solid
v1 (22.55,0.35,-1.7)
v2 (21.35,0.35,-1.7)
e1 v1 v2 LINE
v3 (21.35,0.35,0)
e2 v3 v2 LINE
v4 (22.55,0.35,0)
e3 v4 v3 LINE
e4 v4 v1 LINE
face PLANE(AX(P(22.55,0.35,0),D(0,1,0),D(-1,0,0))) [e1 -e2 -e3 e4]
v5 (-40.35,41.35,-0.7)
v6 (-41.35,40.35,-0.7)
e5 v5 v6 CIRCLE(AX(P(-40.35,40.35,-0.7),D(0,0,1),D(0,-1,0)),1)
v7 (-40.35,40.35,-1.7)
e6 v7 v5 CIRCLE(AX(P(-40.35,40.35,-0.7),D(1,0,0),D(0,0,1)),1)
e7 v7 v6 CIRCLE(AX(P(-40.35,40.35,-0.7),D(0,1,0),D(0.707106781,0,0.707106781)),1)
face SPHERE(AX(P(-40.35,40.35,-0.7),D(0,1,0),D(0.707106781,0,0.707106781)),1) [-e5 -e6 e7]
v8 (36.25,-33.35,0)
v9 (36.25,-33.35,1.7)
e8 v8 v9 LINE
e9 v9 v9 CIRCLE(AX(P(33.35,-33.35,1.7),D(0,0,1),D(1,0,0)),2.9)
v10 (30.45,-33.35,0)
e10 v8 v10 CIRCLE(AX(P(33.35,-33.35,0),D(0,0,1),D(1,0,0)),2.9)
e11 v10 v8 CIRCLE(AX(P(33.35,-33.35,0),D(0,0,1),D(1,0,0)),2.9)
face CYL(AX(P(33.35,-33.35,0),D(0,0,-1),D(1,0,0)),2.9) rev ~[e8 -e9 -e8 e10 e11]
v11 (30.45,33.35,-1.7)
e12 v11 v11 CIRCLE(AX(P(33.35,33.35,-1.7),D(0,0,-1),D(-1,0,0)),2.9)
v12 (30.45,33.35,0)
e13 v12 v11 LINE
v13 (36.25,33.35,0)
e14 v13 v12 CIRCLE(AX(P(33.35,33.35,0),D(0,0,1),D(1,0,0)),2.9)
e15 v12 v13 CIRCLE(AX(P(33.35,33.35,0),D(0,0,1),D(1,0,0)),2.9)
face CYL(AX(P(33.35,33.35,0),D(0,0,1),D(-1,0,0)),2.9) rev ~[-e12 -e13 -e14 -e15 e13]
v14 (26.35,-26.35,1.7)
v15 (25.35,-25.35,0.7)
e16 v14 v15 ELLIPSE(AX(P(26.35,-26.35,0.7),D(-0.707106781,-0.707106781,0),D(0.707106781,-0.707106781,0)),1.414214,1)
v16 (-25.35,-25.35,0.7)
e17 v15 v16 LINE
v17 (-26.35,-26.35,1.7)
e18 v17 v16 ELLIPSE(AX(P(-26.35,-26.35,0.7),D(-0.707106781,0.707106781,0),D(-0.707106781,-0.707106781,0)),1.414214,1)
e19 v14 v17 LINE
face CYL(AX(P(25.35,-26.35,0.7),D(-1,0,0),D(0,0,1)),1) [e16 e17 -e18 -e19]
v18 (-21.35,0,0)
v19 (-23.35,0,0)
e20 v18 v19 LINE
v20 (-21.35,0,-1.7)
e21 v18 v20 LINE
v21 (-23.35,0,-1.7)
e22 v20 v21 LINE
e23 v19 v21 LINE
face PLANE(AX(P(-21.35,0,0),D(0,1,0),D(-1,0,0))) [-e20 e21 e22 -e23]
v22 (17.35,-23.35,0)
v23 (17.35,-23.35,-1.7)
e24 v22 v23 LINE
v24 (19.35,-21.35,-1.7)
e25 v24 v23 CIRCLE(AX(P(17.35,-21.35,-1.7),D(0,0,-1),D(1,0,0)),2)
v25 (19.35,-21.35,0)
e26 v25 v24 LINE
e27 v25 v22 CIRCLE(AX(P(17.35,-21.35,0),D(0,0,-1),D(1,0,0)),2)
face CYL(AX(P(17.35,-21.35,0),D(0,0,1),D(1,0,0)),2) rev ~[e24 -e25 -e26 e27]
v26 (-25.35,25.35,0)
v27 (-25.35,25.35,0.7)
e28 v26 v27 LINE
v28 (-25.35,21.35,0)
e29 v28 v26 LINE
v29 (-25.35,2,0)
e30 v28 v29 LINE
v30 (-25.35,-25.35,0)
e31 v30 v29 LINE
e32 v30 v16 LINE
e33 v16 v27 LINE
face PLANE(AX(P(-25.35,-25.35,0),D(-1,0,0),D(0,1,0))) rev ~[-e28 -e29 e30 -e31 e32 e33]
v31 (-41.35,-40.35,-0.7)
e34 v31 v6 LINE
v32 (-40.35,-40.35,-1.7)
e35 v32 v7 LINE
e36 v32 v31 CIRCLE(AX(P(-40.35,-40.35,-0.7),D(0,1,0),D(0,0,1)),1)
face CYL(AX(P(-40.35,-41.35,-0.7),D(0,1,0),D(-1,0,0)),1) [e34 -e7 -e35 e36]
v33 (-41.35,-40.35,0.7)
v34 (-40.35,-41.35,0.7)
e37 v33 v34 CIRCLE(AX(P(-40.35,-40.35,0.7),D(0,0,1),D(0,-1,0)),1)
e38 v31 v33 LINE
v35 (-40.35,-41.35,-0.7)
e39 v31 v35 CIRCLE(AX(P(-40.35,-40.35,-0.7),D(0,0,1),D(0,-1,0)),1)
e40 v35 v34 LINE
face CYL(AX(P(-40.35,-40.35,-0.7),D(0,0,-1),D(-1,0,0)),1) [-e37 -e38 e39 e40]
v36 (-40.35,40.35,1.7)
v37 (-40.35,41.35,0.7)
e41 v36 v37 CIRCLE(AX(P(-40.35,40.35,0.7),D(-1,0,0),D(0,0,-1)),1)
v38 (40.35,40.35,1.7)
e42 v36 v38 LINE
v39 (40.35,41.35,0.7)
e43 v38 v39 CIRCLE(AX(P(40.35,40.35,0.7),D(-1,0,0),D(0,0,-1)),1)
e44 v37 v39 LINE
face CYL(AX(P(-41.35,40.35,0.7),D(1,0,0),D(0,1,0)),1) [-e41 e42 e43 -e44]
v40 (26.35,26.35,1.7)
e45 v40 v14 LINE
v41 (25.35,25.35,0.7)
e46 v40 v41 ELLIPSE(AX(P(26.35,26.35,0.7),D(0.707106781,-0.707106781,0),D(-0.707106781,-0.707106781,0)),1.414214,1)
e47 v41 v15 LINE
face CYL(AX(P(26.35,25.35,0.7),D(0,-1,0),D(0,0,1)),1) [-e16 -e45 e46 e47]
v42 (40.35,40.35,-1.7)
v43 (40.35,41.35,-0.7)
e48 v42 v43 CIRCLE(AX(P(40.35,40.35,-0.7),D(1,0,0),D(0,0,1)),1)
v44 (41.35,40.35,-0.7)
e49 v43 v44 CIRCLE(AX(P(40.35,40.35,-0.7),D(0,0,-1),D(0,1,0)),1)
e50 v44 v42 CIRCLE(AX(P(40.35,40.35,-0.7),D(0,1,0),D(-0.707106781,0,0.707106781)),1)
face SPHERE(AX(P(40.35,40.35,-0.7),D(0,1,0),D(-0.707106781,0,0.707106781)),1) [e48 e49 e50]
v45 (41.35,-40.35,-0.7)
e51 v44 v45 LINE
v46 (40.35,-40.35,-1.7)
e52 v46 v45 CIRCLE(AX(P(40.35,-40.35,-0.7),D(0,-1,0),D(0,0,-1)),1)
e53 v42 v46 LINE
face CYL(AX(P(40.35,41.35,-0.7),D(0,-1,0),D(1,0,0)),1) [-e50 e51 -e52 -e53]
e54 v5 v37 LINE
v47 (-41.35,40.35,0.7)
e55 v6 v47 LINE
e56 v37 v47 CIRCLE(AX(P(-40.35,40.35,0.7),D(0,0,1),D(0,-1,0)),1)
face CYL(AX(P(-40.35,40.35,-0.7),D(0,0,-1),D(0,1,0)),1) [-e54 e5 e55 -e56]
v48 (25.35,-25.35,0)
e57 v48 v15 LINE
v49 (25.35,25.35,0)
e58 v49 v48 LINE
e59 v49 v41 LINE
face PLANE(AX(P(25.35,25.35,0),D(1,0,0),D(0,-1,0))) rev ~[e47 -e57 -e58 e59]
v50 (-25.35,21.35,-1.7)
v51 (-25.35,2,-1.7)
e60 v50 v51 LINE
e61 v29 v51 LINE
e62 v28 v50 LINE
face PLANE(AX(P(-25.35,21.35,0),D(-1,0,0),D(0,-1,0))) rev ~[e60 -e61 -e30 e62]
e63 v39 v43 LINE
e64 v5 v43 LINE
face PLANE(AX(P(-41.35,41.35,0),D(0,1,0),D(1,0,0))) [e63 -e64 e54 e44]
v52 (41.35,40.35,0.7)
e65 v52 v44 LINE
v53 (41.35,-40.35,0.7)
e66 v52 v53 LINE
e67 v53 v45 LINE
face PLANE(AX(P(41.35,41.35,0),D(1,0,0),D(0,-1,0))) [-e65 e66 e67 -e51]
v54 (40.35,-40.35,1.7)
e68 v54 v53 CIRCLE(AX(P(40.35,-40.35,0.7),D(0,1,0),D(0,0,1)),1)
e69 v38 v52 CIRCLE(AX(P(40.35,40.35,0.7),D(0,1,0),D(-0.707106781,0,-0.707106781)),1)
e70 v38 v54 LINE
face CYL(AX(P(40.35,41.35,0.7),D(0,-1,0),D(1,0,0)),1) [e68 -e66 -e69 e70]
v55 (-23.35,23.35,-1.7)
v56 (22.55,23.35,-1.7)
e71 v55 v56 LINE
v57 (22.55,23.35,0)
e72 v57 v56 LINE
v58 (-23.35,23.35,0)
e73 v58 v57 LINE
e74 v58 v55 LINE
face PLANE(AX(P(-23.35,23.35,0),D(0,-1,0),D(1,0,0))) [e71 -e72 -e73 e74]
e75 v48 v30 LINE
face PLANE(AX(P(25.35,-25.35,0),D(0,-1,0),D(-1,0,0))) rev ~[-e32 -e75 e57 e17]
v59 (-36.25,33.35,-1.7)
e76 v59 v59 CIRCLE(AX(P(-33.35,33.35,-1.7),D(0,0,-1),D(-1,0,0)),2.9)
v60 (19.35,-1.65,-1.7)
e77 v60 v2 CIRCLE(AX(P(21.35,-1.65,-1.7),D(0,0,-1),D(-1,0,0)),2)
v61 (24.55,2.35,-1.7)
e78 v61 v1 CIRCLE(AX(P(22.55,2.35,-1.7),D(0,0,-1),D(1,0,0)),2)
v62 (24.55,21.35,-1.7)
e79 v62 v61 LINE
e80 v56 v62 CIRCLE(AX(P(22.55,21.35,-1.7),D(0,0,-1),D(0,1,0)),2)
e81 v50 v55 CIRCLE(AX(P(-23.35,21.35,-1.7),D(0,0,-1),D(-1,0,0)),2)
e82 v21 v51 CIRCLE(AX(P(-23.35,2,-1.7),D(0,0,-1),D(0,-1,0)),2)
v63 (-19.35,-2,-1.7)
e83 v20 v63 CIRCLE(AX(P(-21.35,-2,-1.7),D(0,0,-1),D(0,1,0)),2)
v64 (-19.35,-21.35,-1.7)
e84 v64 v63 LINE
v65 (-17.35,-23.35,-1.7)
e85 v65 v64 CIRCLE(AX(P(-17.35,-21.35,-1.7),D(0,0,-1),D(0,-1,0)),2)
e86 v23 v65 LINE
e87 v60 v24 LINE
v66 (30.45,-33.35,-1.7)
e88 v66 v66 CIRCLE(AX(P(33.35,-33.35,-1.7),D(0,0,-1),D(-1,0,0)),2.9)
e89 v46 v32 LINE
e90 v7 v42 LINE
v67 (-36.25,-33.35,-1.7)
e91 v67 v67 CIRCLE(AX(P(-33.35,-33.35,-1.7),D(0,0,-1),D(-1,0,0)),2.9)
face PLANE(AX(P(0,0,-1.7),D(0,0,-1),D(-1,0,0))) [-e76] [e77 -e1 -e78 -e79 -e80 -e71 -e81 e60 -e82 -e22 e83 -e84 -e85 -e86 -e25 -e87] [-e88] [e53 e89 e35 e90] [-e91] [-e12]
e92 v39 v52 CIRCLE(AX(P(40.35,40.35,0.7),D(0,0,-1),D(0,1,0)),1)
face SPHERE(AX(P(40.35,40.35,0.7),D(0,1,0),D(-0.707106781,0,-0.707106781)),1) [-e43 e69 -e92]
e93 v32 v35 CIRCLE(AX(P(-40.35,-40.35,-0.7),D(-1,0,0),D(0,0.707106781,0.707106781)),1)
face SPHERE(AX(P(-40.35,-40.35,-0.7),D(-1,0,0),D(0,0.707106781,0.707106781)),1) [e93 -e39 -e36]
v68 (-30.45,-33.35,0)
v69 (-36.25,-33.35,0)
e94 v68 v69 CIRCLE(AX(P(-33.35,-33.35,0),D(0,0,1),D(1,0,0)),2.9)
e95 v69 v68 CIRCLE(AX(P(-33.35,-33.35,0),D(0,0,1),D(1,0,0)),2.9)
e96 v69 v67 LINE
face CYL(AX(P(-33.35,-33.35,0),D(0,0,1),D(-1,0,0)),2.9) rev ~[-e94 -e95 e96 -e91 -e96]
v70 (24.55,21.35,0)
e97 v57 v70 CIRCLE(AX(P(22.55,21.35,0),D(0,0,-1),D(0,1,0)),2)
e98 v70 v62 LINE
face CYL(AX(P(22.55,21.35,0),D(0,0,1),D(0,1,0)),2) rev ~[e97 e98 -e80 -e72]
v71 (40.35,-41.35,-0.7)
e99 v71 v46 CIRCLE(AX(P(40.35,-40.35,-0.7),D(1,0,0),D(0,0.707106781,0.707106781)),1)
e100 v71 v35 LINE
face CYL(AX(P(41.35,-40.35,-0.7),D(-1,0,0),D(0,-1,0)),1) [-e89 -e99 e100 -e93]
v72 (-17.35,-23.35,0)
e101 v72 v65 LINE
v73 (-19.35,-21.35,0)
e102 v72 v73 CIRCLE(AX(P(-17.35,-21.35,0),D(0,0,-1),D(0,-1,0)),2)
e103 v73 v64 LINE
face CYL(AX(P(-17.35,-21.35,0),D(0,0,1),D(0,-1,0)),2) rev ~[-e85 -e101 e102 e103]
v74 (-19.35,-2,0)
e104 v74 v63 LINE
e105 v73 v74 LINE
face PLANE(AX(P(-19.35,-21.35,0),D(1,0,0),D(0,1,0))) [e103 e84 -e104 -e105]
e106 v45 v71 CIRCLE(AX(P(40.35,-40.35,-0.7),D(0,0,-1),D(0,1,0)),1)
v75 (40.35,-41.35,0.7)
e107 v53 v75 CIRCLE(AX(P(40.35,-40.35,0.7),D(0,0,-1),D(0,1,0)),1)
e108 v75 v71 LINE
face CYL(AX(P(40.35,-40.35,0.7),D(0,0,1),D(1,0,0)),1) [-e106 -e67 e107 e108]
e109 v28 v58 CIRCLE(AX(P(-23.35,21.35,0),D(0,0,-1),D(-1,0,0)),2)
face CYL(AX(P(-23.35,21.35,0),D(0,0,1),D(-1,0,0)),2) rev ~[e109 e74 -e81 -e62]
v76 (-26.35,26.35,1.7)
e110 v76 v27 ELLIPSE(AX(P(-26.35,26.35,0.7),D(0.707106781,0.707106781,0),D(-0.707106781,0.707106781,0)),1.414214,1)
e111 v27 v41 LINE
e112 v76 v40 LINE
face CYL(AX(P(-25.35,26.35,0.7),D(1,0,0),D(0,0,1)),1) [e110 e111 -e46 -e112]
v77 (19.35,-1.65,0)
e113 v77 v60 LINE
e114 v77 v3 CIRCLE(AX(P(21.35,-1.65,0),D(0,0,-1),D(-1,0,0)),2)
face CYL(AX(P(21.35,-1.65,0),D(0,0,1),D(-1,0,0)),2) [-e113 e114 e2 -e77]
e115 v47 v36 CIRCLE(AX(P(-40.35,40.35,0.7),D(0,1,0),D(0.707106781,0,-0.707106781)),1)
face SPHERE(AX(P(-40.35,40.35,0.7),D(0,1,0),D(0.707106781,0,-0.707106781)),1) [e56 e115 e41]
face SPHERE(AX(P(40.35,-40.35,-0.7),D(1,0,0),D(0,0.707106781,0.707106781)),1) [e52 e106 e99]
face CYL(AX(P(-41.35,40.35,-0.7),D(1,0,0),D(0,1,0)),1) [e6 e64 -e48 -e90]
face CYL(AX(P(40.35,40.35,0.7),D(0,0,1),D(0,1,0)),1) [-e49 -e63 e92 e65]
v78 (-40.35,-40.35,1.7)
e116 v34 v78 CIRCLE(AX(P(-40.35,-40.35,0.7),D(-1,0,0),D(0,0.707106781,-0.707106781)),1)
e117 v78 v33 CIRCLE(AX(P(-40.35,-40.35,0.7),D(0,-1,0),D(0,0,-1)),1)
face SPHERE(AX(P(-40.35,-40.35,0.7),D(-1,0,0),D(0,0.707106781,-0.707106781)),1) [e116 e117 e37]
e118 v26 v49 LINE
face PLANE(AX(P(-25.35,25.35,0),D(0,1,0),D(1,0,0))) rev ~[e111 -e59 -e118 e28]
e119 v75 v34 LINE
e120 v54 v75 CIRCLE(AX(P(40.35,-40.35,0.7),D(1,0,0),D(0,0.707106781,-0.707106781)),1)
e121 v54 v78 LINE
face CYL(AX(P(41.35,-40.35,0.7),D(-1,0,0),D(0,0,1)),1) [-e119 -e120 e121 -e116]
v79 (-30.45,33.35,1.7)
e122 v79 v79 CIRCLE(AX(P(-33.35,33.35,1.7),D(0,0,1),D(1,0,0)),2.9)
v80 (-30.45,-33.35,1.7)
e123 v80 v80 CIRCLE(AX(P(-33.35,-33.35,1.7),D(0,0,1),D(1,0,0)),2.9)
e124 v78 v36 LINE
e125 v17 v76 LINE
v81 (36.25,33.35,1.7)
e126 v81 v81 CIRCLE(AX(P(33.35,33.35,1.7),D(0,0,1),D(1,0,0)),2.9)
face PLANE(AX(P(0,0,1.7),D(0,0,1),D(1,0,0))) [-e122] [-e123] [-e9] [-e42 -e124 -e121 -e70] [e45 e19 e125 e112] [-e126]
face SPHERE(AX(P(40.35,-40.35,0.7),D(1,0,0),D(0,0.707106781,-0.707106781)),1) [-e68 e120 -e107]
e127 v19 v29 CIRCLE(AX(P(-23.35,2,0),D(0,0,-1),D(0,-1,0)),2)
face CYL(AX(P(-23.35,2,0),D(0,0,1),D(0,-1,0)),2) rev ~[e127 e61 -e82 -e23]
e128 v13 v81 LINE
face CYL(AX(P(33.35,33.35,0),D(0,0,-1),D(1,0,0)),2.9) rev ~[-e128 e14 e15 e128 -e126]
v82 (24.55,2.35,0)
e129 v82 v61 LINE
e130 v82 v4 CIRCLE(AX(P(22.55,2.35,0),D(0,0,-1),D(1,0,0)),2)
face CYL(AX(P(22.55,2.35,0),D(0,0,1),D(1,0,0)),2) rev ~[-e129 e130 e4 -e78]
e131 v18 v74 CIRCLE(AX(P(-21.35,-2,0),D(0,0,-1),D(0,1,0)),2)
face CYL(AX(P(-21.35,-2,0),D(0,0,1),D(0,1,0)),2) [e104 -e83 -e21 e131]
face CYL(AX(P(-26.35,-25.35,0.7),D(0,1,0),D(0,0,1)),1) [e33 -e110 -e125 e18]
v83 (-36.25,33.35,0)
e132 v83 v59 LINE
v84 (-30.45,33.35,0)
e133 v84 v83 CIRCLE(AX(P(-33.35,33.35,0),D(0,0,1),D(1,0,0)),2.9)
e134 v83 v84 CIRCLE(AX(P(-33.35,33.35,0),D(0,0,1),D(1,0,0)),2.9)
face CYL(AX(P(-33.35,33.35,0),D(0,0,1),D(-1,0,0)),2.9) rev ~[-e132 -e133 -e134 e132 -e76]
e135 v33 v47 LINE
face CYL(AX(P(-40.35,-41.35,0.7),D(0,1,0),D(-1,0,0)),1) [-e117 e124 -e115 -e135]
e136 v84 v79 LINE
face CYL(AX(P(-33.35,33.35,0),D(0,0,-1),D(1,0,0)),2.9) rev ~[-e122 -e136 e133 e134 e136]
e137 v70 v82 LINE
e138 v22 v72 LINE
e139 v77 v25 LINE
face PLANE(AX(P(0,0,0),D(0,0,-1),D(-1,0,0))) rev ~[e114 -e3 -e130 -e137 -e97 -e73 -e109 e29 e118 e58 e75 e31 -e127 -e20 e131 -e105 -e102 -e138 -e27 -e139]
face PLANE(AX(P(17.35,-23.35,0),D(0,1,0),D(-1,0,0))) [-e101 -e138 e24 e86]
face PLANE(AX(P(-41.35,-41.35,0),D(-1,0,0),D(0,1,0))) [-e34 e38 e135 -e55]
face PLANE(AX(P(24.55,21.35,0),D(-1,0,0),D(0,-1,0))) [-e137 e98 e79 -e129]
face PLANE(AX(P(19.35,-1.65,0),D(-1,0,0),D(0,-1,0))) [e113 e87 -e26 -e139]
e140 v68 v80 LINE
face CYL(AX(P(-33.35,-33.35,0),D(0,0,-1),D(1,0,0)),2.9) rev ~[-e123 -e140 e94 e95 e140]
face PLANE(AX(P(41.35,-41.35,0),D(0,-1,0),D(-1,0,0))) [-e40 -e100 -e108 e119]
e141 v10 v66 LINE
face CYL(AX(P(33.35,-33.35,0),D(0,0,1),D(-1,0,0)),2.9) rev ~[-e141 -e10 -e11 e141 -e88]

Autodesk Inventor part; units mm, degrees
ref_plane "YZ Plane" through (0, 0, 0) normal (1, 0, 0) x (0, 1, 0)
ref_plane "XZ Plane" through (0, 0, 0) normal (0, 1, 0) x (-1, 0, 0)
ref_plane "XY Plane" through (0, 0, 0) normal (0, 0, 1) x (1, 0, 0)
sketch "Sketch1" plane through (0, 0, 0) normal (0, 0, 1) x (1, 0, 0)
  line L0 (-25.35, 25.35) -> (25.35, 25.35)
  line L1 (25.35, 25.35) -> (25.35, -25.35)
  line L2 (25.35, -25.35) -> (-25.35, -25.35)
  line L3 (-25.35, -25.35) -> (-25.35, 25.35)
  line L4 (-25.35, 25.35) -> (25.35, -25.35) construction
  line L5 (25.35, 25.35) -> (-25.35, -25.35) construction
  line L6 (-41.35, 41.35) -> (41.35, 41.35)
  line L7 (41.35, 41.35) -> (41.35, -41.35)
  line L8 (41.35, -41.35) -> (-41.35, -41.35)
  line L9 (-41.35, -41.35) -> (-41.35, 41.35)
  line L10 (-41.35, 41.35) -> (41.35, -41.35) construction
  line L11 (41.35, 41.35) -> (-41.35, -41.35) construction
  line L12 (-33.35, -33.35) -> (33.35, -33.35) construction
  line L13 (33.35, -33.35) -> (33.35, 33.35) construction
  line L14 (33.35, 33.35) -> (-33.35, 33.35) construction
  line L15 (-33.35, 33.35) -> (-33.35, -33.35) construction
  line L16 (-33.35, -33.35) -> (33.35, 33.35) construction
  line L17 (33.35, -33.35) -> (-33.35, 33.35) construction
  circle A0 centre (-33.35, 33.35) radius 2.9
  circle A1 centre (33.35, 33.35) radius 2.9
  circle A2 centre (33.35, -33.35) radius 2.9
  circle A3 centre (-33.35, -33.35) radius 2.9
  point P0 (0, 0)
  dimension "d0" = 50.7
  dimension "d1" = 50.7
  dimension "d2" = 16
  dimension "d3" = 8
  dimension "d4" = 16
  dimension "d5" = 5.8
extrude "Extrusion1" add sketch "Sketch1" along normal blind 1.7
sketch "Sketch2" plane through (0, 0, 0) normal (0, 0, -1) x (-1, 0, 0)
  line L0 (-25.35, -25.35) -> (-25.35, 25.35) projected
  line L1 (-25.35, 25.35) -> (25.35, 25.35) projected
  line L2 (25.35, 25.35) -> (25.35, -25.35) projected
  line L3 (25.35, -25.35) -> (-25.35, -25.35) projected
  circle A0 centre (33.35, -33.35) radius 2.9 projected
  circle A1 centre (-33.35, -33.35) radius 2.9 projected
  circle A2 centre (-33.35, 33.35) radius 2.9 projected
  circle A3 centre (33.35, 33.35) radius 2.9 projected
  line L4 (41.35, 41.35) -> (-41.35, 41.35) projected
  line L5 (-41.35, 41.35) -> (-41.35, -41.35) projected
  line L6 (-41.35, -41.35) -> (41.35, -41.35) projected
  line L7 (41.35, -41.35) -> (41.35, 41.35) projected
  line L8 (-24.55, 21.35) -> (-24.55, 2.35)
  line L9 (-17.35, -23.35) -> (17.35, -23.35)
  line L10 (19.35, -21.35) -> (19.35, -2)
  line L11 (23.35, 23.35) -> (-22.55, 23.35)
  line L12 (21.35, 0) -> (23.35, 0)
  line L13 (-22.55, 0.35) -> (-21.35, 0.35)
  line L14 (-19.35, -1.65) -> (-19.35, -21.35)
  arc A4 (-22.55, 23.35) -> (-24.55, 21.35) centre (-22.55, 21.35) ccw
  arc A5 (-24.55, 2.35) -> (-22.55, 0.35) centre (-22.55, 2.35) ccw
  arc A6 (-19.35, -1.65) -> (-21.35, 0.35) centre (-21.35, -1.65) ccw
  arc A7 (-19.35, -21.35) -> (-17.35, -23.35) centre (-17.35, -21.35) ccw
  arc A8 (17.35, -23.35) -> (19.35, -21.35) centre (17.35, -21.35) ccw
  arc A9 (21.35, 0) -> (19.35, -2) centre (21.35, -2) ccw
  line L15 (25.35, 21.35) -> (25.35, 2)
  arc A10 (25.35, 21.35) -> (23.35, 23.35) centre (23.35, 21.35) ccw
  arc A11 (23.35, 0) -> (25.35, 2) centre (23.35, 2) ccw
  point P0 (0, 0)
  point P1 (25.35, 23.35)
  point P2 (25.35, 0)
  dimension "d8" = 0.8
  dimension "d9" = 6
  dimension "d10" = 6
  dimension "d11" = 2
  dimension "d12" = 2
  dimension "d13" = 41
  dimension "d14" = 2
  dimension "d15" = 2
extrude "Extrusion2" add sketch "Sketch2" along normal blind 1.7 contours L0 L1 L2 A10 L11 A4 L8 A5 L13 A6 L14 A7 L9 A8 L10 A9 L12 A11 L3 | L7 L6 L5 L4
fillet "Fillet1" radius 1 12 edges at (0, 41.35, 1.7) (-41.35, 0, 1.7) (0, -41.35, 1.7) (41.35, 0, 1.7) (0, 41.35, -1.7) (41.35, 0, -1.7) (0, -41.35, -1.7) (-41.35, 0, -1.7) (25.35, 0, 1.7) (0, -25.35, 1.7) (-25.35, 0, 1.7) (0, 25.35, 1.7)
fillet "Fillet2" radius 1 12 edges at (-41.0571, -41.0571, -1.4071) (-41.0571, -41.0571, 1.4071) (-41.35, -41.35, 0) (41.35, -41.35, 0) (41.0571, -41.0571, -1.4071) (41.0571, -41.0571, 1.4071) (41.35, 41.35, 0) (41.0571, 41.0571, -1.4071) (41.0571, 41.0571, 1.4071) (-41.0571, 41.0571, 1.4071) (-41.0571, 41.0571, -1.4071) (-41.35, 41.35, 0)
equation "\"d3\" = 0.5 * d2"
equation "\"d4\" = d2"
equation "\"d10\" = d9"
equation "\"d11\" = d12"
properties part number "Jig_Power"
